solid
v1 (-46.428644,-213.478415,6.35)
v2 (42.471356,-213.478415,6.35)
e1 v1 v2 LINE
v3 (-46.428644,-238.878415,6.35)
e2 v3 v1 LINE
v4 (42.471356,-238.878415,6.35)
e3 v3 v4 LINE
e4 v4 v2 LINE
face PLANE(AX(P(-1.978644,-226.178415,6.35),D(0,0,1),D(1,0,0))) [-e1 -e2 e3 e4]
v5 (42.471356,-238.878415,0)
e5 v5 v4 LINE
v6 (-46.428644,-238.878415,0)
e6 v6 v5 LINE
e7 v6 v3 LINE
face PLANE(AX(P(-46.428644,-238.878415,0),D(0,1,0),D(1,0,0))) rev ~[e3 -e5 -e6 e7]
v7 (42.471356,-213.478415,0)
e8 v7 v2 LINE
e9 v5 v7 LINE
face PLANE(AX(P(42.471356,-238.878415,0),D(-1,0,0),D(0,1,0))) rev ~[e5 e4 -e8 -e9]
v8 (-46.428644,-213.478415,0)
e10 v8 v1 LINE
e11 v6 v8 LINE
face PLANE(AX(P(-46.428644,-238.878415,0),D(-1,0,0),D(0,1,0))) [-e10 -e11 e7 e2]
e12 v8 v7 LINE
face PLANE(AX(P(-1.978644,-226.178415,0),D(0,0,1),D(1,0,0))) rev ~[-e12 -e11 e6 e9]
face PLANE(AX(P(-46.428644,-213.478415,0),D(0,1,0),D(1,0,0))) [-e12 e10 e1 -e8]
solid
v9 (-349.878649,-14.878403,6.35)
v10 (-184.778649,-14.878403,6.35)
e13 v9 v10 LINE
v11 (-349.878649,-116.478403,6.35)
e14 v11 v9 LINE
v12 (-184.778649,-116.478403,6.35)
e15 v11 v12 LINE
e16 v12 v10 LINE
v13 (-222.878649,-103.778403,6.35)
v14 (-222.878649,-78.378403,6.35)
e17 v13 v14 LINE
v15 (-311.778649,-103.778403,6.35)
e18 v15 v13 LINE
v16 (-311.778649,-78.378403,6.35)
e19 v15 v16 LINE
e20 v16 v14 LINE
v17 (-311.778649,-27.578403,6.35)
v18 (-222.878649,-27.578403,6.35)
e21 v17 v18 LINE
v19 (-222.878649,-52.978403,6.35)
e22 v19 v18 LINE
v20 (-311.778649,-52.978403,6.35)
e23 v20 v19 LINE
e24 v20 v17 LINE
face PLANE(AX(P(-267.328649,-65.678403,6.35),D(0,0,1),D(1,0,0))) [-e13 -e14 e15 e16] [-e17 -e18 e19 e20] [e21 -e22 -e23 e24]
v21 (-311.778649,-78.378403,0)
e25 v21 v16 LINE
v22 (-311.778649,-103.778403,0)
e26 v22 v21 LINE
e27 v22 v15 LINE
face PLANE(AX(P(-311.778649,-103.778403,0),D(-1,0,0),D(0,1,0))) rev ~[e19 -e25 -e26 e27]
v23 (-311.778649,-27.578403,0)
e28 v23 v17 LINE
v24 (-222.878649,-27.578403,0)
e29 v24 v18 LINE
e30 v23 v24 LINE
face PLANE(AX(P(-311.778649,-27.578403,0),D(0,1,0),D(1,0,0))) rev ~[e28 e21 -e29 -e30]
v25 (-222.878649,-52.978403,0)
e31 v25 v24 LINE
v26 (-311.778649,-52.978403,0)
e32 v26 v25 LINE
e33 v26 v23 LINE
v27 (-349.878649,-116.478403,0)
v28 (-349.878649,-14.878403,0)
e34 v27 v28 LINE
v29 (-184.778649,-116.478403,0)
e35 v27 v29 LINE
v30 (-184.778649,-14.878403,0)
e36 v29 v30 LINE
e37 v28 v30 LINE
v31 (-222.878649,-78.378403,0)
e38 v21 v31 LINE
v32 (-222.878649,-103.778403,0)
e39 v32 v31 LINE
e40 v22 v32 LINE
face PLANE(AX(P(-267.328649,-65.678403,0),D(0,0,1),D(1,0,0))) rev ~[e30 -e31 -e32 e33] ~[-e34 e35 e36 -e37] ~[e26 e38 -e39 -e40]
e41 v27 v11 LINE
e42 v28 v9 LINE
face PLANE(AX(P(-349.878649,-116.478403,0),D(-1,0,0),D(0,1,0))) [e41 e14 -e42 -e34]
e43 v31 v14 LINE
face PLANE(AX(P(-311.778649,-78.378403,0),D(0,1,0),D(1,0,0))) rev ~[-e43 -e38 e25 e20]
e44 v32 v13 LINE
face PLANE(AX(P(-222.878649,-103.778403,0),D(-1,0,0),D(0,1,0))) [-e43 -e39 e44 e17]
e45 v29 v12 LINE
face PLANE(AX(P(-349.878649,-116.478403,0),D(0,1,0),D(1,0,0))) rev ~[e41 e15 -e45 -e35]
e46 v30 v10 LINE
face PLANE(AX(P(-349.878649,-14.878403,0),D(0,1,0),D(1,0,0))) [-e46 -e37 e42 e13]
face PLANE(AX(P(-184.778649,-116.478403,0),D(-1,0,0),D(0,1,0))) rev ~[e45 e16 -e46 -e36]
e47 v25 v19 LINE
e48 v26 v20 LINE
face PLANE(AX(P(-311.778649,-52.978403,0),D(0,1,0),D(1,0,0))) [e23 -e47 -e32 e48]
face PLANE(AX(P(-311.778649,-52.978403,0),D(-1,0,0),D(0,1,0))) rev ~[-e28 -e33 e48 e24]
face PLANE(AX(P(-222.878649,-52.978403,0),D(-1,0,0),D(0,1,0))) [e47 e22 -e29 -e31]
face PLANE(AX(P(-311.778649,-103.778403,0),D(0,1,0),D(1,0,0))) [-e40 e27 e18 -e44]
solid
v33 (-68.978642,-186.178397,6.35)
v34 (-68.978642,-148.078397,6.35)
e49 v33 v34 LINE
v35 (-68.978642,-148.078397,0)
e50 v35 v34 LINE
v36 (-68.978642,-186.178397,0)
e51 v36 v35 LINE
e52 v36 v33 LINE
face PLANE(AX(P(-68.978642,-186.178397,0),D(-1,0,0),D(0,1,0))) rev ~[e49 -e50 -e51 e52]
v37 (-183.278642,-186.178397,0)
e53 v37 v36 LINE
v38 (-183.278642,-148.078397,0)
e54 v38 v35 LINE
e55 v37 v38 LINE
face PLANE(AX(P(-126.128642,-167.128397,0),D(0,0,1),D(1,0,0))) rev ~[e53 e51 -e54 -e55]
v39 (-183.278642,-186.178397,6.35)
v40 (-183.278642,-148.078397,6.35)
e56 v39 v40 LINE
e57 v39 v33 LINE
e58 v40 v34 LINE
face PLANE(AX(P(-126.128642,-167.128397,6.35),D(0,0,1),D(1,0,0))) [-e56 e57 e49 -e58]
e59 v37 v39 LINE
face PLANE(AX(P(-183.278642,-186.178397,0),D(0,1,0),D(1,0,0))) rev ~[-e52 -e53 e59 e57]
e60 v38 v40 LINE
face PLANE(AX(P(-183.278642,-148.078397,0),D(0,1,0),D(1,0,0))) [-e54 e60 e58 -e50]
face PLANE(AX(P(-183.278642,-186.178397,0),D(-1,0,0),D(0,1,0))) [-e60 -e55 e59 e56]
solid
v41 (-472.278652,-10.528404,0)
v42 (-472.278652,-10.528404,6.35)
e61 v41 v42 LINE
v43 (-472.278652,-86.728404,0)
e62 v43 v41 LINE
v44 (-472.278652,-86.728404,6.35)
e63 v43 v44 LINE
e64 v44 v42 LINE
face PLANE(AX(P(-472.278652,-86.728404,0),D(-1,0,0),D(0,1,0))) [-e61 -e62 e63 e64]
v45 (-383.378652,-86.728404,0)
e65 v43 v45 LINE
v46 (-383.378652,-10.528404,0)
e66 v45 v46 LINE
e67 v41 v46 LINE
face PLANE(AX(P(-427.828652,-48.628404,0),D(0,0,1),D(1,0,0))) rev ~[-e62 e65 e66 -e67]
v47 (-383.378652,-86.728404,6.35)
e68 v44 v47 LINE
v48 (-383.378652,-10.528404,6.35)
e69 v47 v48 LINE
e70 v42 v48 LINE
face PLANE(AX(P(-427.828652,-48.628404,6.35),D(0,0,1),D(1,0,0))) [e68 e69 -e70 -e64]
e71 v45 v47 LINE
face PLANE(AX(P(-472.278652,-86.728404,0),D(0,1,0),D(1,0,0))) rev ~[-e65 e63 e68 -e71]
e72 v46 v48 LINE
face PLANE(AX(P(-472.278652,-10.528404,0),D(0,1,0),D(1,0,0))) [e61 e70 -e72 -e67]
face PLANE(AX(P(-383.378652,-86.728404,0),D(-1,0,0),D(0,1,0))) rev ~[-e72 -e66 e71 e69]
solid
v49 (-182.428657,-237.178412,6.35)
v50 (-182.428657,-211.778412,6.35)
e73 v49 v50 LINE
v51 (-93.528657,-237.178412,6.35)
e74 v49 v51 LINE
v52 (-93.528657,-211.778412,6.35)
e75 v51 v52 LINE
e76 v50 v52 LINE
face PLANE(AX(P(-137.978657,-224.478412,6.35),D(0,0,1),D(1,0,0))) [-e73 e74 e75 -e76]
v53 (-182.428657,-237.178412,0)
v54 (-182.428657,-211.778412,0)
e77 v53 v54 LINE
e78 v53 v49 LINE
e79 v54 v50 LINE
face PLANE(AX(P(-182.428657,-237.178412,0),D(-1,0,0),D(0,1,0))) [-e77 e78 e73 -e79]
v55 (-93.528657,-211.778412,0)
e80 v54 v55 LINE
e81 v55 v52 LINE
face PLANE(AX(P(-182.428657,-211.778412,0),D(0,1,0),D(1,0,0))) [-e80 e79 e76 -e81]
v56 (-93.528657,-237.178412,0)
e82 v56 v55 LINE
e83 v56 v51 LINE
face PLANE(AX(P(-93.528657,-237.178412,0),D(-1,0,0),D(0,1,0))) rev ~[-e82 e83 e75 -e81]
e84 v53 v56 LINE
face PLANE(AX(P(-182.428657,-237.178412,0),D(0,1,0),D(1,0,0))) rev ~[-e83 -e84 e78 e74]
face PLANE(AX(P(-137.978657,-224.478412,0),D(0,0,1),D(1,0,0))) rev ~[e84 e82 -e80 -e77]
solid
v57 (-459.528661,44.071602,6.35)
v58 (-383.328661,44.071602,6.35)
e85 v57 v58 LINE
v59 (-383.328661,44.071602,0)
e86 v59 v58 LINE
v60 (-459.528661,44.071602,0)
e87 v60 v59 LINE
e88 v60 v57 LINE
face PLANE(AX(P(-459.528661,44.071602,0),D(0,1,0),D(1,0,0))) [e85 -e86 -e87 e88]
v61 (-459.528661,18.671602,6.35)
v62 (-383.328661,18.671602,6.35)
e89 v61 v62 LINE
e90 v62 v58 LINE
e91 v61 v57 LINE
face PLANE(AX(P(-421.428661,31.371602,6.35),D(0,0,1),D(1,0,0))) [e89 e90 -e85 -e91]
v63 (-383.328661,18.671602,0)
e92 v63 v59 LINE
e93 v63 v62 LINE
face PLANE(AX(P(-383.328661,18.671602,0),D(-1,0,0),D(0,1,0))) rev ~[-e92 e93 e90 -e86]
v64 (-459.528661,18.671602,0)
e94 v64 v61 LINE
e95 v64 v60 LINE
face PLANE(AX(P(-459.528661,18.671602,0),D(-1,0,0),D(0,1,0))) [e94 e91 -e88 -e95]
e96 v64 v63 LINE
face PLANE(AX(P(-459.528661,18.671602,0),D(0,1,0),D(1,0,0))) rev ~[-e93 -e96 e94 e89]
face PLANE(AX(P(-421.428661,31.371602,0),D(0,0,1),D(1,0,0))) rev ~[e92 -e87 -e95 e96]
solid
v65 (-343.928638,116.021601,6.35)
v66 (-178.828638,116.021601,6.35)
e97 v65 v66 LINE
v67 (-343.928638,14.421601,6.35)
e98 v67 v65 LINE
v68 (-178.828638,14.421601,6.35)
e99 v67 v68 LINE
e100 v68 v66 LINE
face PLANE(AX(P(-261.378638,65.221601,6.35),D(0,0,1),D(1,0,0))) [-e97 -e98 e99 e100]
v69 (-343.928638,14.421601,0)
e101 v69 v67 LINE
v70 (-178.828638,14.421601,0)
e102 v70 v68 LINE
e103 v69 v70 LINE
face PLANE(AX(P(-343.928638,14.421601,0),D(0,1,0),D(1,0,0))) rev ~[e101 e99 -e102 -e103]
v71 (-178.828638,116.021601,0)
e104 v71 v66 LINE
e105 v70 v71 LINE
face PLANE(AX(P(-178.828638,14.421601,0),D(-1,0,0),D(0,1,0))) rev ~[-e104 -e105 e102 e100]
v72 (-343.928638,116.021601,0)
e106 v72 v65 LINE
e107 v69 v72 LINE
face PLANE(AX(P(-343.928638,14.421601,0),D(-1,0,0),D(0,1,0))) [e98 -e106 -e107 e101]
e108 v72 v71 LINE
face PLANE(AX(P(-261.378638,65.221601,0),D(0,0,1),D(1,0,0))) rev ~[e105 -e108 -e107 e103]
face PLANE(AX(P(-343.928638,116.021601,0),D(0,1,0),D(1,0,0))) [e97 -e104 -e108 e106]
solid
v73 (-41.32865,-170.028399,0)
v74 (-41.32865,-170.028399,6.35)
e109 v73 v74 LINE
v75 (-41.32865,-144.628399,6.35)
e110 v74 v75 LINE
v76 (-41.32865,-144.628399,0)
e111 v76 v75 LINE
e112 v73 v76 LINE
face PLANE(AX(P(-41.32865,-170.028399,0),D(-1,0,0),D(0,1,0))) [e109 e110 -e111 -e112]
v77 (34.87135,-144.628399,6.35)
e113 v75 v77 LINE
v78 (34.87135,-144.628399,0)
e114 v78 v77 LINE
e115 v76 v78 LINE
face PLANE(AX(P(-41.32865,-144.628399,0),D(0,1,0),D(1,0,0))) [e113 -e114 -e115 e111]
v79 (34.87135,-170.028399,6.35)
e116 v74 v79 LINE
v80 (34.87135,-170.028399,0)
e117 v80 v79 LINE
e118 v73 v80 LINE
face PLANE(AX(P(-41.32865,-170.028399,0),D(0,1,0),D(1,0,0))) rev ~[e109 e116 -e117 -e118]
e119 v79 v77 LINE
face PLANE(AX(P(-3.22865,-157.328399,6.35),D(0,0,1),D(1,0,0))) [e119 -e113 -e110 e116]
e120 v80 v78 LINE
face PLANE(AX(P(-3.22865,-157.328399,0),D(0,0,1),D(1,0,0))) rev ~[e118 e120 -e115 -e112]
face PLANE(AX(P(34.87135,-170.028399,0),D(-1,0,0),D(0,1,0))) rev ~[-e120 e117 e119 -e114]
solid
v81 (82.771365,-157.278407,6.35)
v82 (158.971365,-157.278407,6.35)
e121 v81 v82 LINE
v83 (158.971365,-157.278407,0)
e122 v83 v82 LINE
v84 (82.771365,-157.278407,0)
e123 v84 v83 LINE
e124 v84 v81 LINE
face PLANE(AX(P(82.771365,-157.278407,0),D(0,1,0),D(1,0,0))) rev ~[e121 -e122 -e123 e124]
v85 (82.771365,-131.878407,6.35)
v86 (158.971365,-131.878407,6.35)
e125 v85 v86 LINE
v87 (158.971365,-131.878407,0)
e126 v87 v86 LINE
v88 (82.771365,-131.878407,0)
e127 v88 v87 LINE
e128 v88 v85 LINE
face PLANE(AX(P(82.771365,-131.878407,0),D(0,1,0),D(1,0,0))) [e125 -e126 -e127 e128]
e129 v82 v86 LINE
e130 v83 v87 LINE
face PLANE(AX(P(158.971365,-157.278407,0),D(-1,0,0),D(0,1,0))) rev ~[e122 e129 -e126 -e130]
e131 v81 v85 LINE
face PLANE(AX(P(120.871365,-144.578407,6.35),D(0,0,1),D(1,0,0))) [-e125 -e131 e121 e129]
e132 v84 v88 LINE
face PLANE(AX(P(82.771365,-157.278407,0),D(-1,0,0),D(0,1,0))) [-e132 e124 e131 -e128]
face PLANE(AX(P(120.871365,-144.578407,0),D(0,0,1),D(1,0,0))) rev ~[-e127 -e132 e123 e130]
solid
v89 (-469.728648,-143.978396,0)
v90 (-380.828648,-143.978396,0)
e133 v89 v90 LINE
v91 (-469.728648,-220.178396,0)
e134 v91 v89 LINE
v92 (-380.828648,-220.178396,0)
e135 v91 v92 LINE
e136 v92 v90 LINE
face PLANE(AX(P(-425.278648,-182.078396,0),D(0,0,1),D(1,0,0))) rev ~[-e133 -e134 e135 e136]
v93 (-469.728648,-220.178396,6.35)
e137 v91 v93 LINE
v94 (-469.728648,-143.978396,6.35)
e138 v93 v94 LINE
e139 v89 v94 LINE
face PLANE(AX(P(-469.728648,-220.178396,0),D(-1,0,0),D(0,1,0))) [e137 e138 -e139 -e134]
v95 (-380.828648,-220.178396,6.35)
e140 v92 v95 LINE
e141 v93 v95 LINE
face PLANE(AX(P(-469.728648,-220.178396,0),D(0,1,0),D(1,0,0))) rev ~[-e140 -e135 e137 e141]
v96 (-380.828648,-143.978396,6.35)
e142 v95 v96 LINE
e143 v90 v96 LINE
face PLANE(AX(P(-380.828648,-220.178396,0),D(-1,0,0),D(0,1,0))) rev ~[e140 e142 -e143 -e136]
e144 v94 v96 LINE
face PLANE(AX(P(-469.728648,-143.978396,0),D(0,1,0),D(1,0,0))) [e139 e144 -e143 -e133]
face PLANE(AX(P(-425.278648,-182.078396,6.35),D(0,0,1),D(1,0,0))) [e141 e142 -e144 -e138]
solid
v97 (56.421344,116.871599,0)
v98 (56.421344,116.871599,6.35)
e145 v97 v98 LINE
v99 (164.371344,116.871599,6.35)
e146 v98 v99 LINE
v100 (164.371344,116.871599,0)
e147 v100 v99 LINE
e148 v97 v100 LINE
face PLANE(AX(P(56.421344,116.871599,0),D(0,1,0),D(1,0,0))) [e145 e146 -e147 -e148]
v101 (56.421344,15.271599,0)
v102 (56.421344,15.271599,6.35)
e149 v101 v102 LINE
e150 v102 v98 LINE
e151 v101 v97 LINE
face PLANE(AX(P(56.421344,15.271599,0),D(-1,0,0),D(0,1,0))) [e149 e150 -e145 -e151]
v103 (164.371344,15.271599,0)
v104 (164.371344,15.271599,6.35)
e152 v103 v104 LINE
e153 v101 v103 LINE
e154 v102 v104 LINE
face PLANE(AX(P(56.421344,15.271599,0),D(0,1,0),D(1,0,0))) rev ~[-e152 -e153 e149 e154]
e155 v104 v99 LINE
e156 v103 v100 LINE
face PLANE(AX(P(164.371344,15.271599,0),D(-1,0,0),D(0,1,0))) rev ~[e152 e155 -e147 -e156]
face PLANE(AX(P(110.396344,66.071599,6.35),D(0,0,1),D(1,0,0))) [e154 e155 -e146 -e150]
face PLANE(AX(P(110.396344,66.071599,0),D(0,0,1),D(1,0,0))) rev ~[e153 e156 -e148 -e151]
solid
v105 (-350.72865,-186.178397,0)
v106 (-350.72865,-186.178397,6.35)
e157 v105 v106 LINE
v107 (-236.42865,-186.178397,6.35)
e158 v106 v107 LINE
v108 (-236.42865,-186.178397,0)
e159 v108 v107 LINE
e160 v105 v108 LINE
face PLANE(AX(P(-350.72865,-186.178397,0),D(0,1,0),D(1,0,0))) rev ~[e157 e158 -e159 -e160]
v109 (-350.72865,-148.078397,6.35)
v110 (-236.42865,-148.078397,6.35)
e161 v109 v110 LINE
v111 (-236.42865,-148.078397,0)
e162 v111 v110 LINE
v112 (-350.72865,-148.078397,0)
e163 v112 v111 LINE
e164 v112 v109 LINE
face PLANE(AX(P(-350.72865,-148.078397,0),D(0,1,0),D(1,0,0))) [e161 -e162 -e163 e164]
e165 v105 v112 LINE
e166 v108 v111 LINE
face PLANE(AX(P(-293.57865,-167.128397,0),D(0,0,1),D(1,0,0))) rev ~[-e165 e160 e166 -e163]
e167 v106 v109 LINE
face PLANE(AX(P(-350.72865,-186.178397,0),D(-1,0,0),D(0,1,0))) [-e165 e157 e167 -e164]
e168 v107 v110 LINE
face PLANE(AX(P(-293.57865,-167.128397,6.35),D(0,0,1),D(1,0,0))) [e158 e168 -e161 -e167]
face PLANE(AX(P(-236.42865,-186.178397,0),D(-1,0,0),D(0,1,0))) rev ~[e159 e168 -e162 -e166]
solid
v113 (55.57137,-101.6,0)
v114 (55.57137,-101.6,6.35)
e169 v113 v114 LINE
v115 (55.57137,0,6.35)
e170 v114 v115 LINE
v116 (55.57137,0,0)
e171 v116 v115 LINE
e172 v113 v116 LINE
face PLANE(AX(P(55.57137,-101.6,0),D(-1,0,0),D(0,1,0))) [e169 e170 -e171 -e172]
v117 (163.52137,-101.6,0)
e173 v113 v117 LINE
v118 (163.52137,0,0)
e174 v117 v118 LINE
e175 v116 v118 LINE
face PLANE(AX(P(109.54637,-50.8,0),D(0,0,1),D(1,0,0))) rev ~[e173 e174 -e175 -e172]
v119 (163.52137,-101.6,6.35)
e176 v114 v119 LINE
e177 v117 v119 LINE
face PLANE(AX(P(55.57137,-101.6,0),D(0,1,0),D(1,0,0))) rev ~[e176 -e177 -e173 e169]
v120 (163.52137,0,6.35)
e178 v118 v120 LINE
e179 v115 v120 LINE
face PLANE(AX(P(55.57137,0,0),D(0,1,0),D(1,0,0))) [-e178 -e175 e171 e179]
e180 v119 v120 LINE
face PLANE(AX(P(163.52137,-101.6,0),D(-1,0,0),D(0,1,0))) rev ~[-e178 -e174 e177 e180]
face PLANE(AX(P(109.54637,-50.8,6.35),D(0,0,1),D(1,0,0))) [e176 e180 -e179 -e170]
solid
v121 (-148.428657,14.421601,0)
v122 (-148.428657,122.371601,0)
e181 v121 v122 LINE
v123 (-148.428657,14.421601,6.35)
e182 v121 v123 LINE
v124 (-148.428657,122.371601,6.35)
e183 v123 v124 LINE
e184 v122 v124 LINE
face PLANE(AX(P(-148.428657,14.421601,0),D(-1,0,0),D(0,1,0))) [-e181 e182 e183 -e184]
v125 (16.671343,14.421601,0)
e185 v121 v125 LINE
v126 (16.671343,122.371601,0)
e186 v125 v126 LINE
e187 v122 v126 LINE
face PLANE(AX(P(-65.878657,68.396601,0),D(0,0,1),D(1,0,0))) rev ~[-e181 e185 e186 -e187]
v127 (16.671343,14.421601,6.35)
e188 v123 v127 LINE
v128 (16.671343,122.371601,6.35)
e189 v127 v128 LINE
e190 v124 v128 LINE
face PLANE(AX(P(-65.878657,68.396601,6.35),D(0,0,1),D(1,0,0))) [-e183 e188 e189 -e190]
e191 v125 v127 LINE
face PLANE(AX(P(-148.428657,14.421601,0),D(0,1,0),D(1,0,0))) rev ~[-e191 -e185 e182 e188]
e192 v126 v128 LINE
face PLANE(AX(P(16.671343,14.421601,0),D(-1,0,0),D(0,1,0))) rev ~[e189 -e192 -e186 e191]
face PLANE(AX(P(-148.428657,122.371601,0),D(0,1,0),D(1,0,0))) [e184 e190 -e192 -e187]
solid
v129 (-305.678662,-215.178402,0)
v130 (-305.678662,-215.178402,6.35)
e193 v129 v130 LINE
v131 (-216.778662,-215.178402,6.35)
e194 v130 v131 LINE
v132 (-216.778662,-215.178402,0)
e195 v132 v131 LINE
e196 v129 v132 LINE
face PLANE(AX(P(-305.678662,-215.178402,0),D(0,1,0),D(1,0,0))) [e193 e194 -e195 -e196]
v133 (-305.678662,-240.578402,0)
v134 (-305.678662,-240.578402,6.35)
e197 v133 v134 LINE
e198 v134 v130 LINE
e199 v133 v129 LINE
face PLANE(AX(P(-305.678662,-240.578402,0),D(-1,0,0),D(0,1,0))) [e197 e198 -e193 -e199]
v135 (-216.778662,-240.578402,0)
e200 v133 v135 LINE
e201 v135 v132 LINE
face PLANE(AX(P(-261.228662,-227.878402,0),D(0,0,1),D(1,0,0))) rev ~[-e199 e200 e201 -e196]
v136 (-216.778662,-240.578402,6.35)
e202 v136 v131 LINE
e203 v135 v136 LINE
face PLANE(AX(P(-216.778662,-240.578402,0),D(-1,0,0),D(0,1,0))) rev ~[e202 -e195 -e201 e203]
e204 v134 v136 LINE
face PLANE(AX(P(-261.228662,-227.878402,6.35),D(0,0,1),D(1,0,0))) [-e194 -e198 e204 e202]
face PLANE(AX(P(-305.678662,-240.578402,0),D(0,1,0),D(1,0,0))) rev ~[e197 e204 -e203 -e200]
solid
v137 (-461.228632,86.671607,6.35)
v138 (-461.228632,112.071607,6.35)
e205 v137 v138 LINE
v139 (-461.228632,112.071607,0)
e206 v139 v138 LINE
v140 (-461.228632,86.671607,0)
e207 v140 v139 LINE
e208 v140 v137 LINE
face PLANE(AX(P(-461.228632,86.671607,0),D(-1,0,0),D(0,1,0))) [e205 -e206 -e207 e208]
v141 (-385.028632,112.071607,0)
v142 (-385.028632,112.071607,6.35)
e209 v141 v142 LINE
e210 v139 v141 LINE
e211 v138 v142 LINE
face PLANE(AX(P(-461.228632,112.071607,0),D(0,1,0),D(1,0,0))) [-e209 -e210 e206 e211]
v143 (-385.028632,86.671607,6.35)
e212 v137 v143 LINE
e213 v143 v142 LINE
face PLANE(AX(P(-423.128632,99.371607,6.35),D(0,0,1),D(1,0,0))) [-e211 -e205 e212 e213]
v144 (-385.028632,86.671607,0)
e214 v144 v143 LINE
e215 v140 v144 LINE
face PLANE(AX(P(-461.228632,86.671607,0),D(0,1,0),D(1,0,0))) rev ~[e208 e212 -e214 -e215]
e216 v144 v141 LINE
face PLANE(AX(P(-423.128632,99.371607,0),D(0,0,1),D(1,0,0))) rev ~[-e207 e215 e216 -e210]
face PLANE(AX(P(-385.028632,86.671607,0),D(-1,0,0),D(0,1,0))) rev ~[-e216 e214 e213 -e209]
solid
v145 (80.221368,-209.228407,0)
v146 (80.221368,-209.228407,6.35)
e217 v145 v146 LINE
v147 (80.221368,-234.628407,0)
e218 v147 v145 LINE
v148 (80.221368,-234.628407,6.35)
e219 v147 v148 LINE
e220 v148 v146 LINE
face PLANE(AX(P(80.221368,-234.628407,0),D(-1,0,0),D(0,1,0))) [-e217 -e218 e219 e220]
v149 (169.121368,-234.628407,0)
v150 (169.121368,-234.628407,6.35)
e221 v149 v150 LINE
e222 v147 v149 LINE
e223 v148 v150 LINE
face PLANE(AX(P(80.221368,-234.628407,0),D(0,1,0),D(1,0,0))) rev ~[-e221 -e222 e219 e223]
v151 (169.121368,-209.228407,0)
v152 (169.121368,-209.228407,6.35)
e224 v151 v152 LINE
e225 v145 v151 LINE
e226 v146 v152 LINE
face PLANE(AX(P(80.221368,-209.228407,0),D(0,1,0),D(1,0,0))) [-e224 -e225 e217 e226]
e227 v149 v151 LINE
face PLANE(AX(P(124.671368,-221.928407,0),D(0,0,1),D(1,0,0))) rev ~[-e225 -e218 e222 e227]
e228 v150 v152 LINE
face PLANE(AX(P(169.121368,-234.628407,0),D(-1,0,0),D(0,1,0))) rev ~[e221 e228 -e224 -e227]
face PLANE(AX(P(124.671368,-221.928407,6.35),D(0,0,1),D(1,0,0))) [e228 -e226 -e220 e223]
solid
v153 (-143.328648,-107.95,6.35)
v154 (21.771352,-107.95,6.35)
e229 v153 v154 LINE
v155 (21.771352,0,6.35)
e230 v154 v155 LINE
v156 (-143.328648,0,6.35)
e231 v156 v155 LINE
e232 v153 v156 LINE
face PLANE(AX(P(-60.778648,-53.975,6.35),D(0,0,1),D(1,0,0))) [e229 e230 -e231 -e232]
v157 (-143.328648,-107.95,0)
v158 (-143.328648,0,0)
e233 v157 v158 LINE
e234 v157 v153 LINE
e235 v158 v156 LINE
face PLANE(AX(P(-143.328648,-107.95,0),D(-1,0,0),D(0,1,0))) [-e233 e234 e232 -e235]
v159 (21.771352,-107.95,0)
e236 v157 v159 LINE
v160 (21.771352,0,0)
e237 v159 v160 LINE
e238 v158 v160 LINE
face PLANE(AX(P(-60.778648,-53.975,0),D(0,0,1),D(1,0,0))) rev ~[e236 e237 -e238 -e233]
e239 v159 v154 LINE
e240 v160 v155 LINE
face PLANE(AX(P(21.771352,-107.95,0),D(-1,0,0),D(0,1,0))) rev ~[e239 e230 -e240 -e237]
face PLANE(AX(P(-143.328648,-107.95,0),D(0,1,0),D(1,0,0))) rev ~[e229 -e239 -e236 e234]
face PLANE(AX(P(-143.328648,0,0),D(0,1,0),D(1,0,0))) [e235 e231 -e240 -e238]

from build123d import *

# Parameters (mm, degrees)
F1_W     = 76.2
F1_H     = 25.4
F2_DEPTH = 6.35
F1_W_2   = 88.9
F1_H_2   = 76.2
F1_W_3   = 165.1
F1_H_3   = 101.6
F1_W_4   = 114.3
F1_H_4   = 38.1
F1_W_5   = 107.95
F1_H_5   = 107.95


# Not quite as in the source:
# - a variable given as a bare number and used for a length is read in inches; the dataset says mm whatever the document's units were


with BuildPart() as f2:
    # F1 (on Top) → F2 (new body)
    with BuildSketch(Plane.XY):
        with Locations((-423.1286319411, 99.3716068767)):
            Rectangle(F1_W, F1_H)
    extrude(amount=F2_DEPTH)


with BuildPart() as f2b:
    # F1 (on Top) → F2, piece 2 (new body)
    with BuildSketch(Plane.XY):
        with Locations((-421.4286606973, 31.3716022751)):
            Rectangle(F1_W, F1_H)
    extrude(amount=F2_DEPTH)


with BuildPart() as f2c:
    # F1 (on Top) → F2, piece 3 (new body)
    with BuildSketch(Plane.XY):
        with Locations((-427.8286524599, -48.6284039599)):
            Rectangle(F1_W_2, F1_H_2)
    extrude(amount=F2_DEPTH)


with BuildPart() as f2d:
    # F1 (on Top) → F2, piece 4 (new body)
    with BuildSketch(Plane.XY):
        with Locations((-425.2786477248, -182.0783964606)):
            Rectangle(F1_W_2, F1_H_2)
    extrude(amount=F2_DEPTH)


with BuildPart() as f2e:
    # F1 (on Top) → F2, piece 5 (new body)
    with BuildSketch(Plane.XY):
        with Locations((-261.3786375164, 65.2216013642)):
            Rectangle(F1_W_3, F1_H_3)
    extrude(amount=F2_DEPTH)


with BuildPart() as f2f:
    # F1 (on Top) → F2, piece 6 (new body)
    with BuildSketch(Plane.XY):
        with Locations((-267.328648565, -65.6784033552)):
            Rectangle(F1_W_3, F1_H_3)
        with Locations((-267.328648565, -91.0784033552)):
            Rectangle(F1_W_2, F1_H, mode=Mode.SUBTRACT)
        with Locations((-267.328648565, -40.2784033552)):
            Rectangle(F1_W_2, F1_H, mode=Mode.SUBTRACT)
    extrude(amount=F2_DEPTH)


with BuildPart() as f2g:
    # F1 (on Top) → F2, piece 7 (new body)
    with BuildSketch(Plane.XY):
        with Locations((-293.5786501434, -167.1283971517)):
            Rectangle(F1_W_4, F1_H_4)
    extrude(amount=F2_DEPTH)


with BuildPart() as f2h:
    # F1 (on Top) → F2, piece 8 (new body)
    with BuildSketch(Plane.XY):
        with Locations((-261.2286622286, -227.8784024286)):
            Rectangle(F1_W_2, F1_H)
    extrude(amount=F2_DEPTH)


with BuildPart() as f2i:
    # F1 (on Top) → F2, piece 9 (new body)
    with BuildSketch(Plane.XY):
        with Locations((-126.1286423772, -167.1283971517)):
            Rectangle(F1_W_4, F1_H_4)
    extrude(amount=F2_DEPTH)


with BuildPart() as f2j:
    # F1 (on Top) → F2, piece 10 (new body)
    with BuildSketch(Plane.XY):
        with Locations((-137.9786567553, -224.4784120716)):
            Rectangle(F1_W_2, F1_H)
    extrude(amount=F2_DEPTH)


with BuildPart() as f2k:
    # F1 (on Top) → F2, piece 11 (new body)
    with BuildSketch(Plane.XY):
        with Locations((-3.2286500492, -157.3283990755)):
            Rectangle(F1_W, F1_H)
    extrude(amount=F2_DEPTH)


with BuildPart() as f2l:
    # F1 (on Top) → F2, piece 12 (new body)
    with BuildSketch(Plane.XY):
        with Locations((-1.9786435629, -226.1784152283)):
            Rectangle(F1_W_2, F1_H)
    extrude(amount=F2_DEPTH)


with BuildPart() as f2m:
    # F1 (on Top) → F2, piece 13 (new body)
    with BuildSketch(Plane.XY):
        with Locations((124.6713682238, -221.9284073365)):
            Rectangle(F1_W_2, F1_H)
    extrude(amount=F2_DEPTH)


with BuildPart() as f2n:
    # F1 (on Top) → F2, piece 14 (new body)
    with BuildSketch(Plane.XY):
        with Locations((120.8713649807, -144.5784073129)):
            Rectangle(F1_W, F1_H)
    extrude(amount=F2_DEPTH)


with BuildPart() as f2o:
    # F1 (on Top) → F2, piece 15 (new body)
    with BuildSketch(Plane.XY):
        with Locations((109.5463703205, -50.8)):
            Rectangle(F1_W_5, F1_H_3)
    extrude(amount=F2_DEPTH)


with BuildPart() as f2p:
    # F1 (on Top) → F2, piece 16 (new body)
    with BuildSketch(Plane.XY):
        with Locations((110.396343975, 66.0715989535)):
            Rectangle(F1_W_5, F1_H_3)
    extrude(amount=F2_DEPTH)


with BuildPart() as f2q:
    # F1 (on Top) → F2, piece 17 (new body)
    with BuildSketch(Plane.XY):
        with Locations((-65.8786574463, 68.3966013642)):
            Rectangle(F1_W_3, F1_H_5)
    extrude(amount=F2_DEPTH)


with BuildPart() as f2r:
    # F1 (on Top) → F2, piece 18 (new body)
    with BuildSketch(Plane.XY):
        with Locations((-60.7786479761, -53.975)):
            Rectangle(F1_W_3, F1_H_5)
    extrude(amount=F2_DEPTH)


solid = Compound([f2.part, f2b.part, f2c.part, f2d.part, f2e.part, f2f.part, f2g.part, f2h.part, f2i.part, f2j.part, f2k.part, f2l.part, f2m.part, f2n.part, f2o.part, f2p.part, f2q.part, f2r.part])
